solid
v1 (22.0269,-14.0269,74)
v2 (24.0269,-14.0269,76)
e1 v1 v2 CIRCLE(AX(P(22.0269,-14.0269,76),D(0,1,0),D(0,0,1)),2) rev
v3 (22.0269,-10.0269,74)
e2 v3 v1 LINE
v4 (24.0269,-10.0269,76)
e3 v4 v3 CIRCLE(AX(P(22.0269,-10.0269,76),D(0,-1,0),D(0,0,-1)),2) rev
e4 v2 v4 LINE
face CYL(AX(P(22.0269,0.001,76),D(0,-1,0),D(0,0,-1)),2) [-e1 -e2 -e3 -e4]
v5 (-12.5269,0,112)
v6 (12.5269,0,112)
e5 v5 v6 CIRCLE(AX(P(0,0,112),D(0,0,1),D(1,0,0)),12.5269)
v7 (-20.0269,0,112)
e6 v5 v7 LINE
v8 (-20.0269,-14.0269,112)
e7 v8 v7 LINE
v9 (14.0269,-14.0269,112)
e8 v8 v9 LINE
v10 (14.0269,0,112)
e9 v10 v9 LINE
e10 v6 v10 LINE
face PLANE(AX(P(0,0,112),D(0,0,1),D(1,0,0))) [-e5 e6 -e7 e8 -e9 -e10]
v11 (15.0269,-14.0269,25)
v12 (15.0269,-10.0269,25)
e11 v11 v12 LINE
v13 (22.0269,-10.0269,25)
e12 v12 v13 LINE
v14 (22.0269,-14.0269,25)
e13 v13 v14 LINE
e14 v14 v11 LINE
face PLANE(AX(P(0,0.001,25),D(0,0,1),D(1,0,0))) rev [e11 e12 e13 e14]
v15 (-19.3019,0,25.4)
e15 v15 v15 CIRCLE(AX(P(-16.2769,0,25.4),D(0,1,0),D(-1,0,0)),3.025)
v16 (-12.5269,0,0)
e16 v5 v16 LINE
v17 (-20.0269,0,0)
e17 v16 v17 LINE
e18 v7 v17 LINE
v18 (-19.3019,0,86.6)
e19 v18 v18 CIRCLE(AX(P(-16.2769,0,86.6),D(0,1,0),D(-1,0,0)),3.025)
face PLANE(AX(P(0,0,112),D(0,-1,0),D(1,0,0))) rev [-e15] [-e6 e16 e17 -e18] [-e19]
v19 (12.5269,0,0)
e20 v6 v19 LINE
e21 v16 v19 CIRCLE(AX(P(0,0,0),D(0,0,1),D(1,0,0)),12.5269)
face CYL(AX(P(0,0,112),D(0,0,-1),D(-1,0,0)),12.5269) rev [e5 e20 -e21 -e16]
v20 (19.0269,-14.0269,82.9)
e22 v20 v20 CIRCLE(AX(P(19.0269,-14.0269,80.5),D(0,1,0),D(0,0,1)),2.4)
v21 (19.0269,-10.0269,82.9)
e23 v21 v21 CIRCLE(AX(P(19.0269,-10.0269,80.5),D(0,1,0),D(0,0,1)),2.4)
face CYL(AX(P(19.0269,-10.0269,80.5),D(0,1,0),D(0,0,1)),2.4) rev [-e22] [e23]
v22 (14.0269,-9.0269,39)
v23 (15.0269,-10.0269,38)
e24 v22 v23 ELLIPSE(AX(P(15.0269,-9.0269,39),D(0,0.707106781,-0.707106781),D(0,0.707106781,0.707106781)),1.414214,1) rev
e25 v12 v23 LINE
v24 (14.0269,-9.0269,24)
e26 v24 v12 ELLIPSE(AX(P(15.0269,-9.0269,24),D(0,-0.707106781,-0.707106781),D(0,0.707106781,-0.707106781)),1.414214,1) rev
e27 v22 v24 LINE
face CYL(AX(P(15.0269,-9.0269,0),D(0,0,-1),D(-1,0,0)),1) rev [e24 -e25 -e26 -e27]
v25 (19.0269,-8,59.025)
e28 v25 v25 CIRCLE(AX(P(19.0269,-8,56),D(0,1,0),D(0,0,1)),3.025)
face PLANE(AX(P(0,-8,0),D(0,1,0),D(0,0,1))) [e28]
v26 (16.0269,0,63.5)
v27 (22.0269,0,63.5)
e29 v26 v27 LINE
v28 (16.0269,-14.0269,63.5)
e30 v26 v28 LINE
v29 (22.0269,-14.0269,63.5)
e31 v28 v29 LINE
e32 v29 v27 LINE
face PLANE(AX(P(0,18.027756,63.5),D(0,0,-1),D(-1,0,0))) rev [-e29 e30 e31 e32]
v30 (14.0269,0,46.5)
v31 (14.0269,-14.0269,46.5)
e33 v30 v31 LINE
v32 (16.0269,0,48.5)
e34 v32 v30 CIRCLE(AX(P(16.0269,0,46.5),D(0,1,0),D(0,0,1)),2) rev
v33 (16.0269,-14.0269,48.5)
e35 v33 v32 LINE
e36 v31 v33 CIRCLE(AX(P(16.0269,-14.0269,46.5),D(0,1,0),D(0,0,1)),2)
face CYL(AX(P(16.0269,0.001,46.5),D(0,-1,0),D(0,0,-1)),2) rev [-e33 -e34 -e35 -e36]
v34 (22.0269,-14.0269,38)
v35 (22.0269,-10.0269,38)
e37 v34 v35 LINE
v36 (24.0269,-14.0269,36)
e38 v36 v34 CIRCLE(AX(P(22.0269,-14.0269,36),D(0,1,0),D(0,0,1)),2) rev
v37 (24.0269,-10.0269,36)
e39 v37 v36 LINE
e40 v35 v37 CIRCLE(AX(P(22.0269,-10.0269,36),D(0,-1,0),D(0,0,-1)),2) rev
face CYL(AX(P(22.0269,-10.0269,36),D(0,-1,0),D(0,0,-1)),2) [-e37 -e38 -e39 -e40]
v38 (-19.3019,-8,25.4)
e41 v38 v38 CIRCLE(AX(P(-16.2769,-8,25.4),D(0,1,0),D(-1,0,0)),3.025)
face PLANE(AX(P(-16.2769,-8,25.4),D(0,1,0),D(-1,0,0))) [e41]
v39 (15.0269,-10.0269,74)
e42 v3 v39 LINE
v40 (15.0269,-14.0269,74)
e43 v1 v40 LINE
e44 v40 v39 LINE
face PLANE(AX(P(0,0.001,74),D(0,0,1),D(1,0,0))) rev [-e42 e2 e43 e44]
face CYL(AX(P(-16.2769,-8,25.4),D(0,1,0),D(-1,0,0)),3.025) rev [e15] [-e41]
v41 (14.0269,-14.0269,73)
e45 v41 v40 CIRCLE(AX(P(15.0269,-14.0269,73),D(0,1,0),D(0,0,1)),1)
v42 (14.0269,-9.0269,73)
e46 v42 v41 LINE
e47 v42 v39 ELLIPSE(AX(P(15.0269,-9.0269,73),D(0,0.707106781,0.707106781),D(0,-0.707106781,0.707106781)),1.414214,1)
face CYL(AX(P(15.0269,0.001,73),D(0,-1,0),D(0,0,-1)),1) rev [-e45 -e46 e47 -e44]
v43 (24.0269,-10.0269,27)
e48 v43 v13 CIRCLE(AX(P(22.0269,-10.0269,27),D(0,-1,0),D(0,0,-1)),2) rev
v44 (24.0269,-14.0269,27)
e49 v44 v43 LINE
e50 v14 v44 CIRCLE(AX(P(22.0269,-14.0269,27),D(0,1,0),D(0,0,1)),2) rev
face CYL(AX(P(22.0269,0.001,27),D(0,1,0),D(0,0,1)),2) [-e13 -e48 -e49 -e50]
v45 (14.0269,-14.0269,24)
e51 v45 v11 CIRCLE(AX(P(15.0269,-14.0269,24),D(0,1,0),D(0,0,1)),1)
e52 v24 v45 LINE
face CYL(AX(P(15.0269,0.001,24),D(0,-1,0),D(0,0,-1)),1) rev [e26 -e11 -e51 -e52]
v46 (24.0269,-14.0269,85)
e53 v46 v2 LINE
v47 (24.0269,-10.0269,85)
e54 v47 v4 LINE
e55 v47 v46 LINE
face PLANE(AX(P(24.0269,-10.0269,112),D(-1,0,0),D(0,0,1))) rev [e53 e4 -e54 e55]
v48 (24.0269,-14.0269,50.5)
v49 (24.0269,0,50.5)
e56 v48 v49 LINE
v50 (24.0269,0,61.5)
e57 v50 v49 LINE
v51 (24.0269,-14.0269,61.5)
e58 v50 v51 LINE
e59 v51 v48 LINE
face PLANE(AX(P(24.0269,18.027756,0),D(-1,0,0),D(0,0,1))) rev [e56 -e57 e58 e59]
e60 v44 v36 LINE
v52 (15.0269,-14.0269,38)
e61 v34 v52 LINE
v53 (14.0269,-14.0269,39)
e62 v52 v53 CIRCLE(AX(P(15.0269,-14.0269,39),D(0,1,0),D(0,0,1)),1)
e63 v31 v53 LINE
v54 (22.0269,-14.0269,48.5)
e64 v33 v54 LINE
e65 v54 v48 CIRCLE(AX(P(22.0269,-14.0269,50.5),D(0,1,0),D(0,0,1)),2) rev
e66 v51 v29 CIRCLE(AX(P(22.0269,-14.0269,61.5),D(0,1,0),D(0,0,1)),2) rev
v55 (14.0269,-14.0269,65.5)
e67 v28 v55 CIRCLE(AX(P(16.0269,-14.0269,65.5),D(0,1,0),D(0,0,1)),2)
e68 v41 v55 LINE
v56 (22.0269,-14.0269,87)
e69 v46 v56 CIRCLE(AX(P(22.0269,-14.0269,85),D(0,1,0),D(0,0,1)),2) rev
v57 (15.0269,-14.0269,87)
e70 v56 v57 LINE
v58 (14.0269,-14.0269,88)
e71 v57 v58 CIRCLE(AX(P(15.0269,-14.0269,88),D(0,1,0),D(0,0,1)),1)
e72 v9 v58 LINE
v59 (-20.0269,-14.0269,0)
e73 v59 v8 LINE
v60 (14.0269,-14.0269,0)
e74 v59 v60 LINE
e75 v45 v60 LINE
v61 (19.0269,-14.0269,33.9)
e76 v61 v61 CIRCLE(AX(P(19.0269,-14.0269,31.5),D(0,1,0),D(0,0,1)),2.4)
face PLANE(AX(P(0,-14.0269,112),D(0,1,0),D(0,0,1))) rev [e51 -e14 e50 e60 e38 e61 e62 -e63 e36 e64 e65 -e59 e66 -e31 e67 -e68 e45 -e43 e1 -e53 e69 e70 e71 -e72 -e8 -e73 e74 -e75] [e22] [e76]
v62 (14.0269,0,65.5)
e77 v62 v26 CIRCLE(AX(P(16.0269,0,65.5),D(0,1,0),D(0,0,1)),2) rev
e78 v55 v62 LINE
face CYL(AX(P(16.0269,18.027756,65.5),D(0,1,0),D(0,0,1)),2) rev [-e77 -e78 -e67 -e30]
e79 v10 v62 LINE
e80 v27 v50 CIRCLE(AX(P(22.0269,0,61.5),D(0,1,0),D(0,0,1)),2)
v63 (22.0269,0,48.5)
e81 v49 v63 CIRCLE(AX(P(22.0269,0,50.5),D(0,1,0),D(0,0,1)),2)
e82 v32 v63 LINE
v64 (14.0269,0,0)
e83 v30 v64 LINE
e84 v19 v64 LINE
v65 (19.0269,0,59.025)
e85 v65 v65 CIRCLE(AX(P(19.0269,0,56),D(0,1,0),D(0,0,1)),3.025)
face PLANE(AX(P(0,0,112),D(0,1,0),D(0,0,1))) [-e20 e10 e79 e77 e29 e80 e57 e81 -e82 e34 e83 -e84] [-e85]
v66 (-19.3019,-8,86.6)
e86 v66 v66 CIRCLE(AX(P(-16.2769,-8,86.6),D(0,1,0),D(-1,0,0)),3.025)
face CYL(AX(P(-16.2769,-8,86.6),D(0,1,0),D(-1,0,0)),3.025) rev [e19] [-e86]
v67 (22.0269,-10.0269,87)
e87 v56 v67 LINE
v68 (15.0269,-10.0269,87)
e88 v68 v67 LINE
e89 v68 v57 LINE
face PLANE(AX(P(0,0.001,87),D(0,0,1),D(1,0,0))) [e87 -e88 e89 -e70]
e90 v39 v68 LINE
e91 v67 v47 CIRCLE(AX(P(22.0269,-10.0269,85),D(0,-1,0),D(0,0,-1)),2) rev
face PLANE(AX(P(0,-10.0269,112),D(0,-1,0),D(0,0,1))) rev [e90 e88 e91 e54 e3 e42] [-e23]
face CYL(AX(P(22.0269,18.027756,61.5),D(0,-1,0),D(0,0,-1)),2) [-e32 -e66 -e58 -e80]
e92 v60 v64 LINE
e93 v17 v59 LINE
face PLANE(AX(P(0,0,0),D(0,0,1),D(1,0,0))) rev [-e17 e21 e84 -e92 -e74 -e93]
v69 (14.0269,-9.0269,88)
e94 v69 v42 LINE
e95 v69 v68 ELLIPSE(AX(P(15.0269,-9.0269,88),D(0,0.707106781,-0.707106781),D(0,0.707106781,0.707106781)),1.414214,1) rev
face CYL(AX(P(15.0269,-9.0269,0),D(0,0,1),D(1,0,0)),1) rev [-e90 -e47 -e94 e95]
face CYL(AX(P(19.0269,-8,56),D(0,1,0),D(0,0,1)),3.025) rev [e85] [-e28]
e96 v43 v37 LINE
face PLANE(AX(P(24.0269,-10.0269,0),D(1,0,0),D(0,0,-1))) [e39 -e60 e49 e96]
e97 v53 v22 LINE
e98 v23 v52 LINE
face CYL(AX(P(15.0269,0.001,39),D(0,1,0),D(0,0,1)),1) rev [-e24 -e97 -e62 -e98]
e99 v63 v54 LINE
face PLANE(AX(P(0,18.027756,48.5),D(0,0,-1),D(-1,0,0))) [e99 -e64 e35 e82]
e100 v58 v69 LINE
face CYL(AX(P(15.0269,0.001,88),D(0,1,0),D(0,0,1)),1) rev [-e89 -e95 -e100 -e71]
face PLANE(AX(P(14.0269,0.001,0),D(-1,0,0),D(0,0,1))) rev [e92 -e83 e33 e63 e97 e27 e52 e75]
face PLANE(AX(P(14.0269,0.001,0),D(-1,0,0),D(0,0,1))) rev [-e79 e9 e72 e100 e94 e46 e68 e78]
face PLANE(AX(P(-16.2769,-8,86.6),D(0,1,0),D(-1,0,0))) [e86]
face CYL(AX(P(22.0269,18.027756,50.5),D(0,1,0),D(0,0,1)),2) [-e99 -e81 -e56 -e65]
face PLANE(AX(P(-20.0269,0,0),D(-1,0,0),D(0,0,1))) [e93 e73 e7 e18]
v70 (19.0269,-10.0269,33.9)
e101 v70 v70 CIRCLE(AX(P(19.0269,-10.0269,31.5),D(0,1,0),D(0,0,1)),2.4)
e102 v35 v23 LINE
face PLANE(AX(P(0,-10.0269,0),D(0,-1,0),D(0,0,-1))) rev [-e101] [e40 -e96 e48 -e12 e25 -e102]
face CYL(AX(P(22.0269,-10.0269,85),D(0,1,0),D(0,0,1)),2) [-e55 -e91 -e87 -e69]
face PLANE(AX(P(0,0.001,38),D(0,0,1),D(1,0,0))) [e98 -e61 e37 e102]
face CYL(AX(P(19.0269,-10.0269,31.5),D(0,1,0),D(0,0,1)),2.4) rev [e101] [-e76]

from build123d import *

# Parameters (mm, degrees)
BOSS_EXTRUDE1_DEPTH  = 112
SKETCH3_W            = 11
SKETCH3_H            = 11
BOSS_EXTRUDE2_DEPTH  = 4
BOSS_EXTRUDE3_REACH  = 127.251
SKETCH8_W            = 10
SKETCH8_H            = 13
BOSS_EXTRUDE4_DEPTH  = 4
FILLET1_R            = 2
M4_CLEARANCE_HOLE1_D = 4.8
MIRROR1_START        = 13.844633107
MIRROR1_OUTLINE_W    = 4
MIRROR1_OUTLINE_H    = 13
MIRROR1_DEPTH        = 2.782266793
MIRROR1_START_2      = 21.4269001
MIRROR1_2_OUTLINE_W  = 4
MIRROR1_2_OUTLINE_H  = 13
MIRROR1_2_DEPTH      = 0.5999999
MIRROR1_START_3      = 74
MIRROR1_3_DEPTH      = 13
MIRROR1_4_OUTLINE_W  = 4.8000002
MIRROR1_4_OUTLINE_H  = 4
MIRROR1_4_DEPTH      = 4.0999999
MIRROR1_START_4      = 82.9000001
MIRROR1_5_OUTLINE_W  = 4.8000002
MIRROR1_5_OUTLINE_H  = 4
MIRROR1_5_DEPTH      = 4.0999999
MIRROR1_START_5      = 76
MIRROR1_6_OUTLINE_W  = 2
MIRROR1_6_OUTLINE_H  = 4
MIRROR1_6_DEPTH      = 9
MIRROR1_START_6      = -14.0269
MIRROR1_7_DEPTH      = 4
CUT_EXTRUDE2_DEPTH   = 126.72521882
BOSS_EXTRUDE5_START  = -87
BOSS_EXTRUDE5_DEPTH  = 112
SKETCH14_W           = 112
SKETCH14_H           = 14.0269
BOSS_EXTRUDE6_DEPTH  = 1
SKETCH2_R            = 3.025
CUT_EXTRUDE1_DEPTH   = 8
SKETCH15_W           = 10
SKETCH15_H           = 15
SKETCH15_R           = 3.025
BOSS_EXTRUDE7_DEPTH  = 14.0269
SKETCH16_R           = 3.025
CUT_EXTRUDE3_DEPTH   = 8
FILLET2_R            = 2
FILLET3_R            = 1


with BuildPart() as part:
    # Sketch1 → Boss-Extrude1 (new body)
    with BuildSketch(Plane.XY):
        with BuildLine():
            ThreePointArc((0, -14.0269), (-9.918516109, -9.918516109), (-14.0269, 0))
            Line((-14.0269, 0), (-19.0269, 0))
            Line((-19.0269, 0), (-19.0269, -14.0269))
            Line((-19.0269, -14.0269), (0, -14.0269))
        make_face()
        with BuildLine():
            Line((-12.5269, 0), (-14.0269, 0))
            ThreePointArc((-14.0269, 0), (-9.918516109, -9.918516109), (0, -14.0269))
            ThreePointArc((0, -14.0269), (9.918516109, -9.918516109), (14.0269, 0))
            Line((14.0269, 0), (12.5269, 0))
            ThreePointArc((12.5269, 0), (0, -12.5269), (-12.5269, 0))
        make_face()
    extrude(amount=BOSS_EXTRUDE1_DEPTH)

    # Sketch3 → Boss-Extrude2 (add)
    with BuildSketch(Plane.XZ.offset(14.0269)):
        with Locations((-13.5269, 117.5)):
            Rectangle(SKETCH3_W, SKETCH3_H)
    extrude(amount=-BOSS_EXTRUDE2_DEPTH)

    # Sketch7 → Boss-Extrude3 (add, up to next)
    with BuildSketch(Plane.XZ.offset(14.0269), mode=Mode.PRIVATE) as boss_extrude3_sk1:
        Polygon((0, 25), (14.0269, 25), (14.0269, 31.5), (14.0269, 38), (0, 38), align=None)
    boss_extrude3_tool1 = extrude(boss_extrude3_sk1.sketch, amount=-BOSS_EXTRUDE3_REACH, mode=Mode.PRIVATE) - part.part
    add(boss_extrude3_tool1.solids().sort_by_distance((7.01345, -14.0269, 31.5))[0])

    # Sketch8 → Boss-Extrude4 (add)
    with BuildSketch(Plane.XZ.offset(14.0269)):
        with Locations((19.0269, 31.5)):
            Rectangle(SKETCH8_W, SKETCH8_H)
    extrude(amount=-BOSS_EXTRUDE4_DEPTH)

    # Fillet1
    fillet1_edges = [part.edges().sort_by_distance(p)[0] for p in [
        (-19.0269, -12.0269, 123),
        (-8.0269, -12.0269, 123),
        (24.0269, -12.0269, 38),
        (24.0269, -12.0269, 25),
    ]]
    fillet(fillet1_edges, radius=FILLET1_R)

    # M4 Clearance Hole1 (through all)
    with Locations(Plane(origin=(0, -10.0269, 0), x_dir=(1, 0, 0), z_dir=(0, 1, 0))):
        with Locations((-13.5269, -117.5), (19.0269, -31.5)):
            Hole(M4_CLEARANCE_HOLE1_D / 2)



with BuildPart() as body_2:
    # Mirror1: read off the stored shape, not the designer's step
    # Mirror1 outline → Mirror1 (new body)
    with BuildSketch(Plane.YZ.offset(MIRROR1_START)):
        with Locations((-12.0269, 80.5)):
            Rectangle(MIRROR1_OUTLINE_W, MIRROR1_OUTLINE_H)
    extrude(amount=MIRROR1_DEPTH)


with BuildPart() as body_3:
    # Mirror1 2 outline → Mirror1 2 (new body)
    with BuildSketch(Plane.YZ.offset(MIRROR1_START_2)):
        with Locations((-12.0269, 80.5)):
            Rectangle(MIRROR1_2_OUTLINE_W, MIRROR1_2_OUTLINE_H)
    extrude(amount=MIRROR1_2_DEPTH)


with BuildPart() as part_1:
    add(part.part)

    add(body_2.part)  # Mirror1 3 merges body 2
    # Mirror1 3 outline → Mirror1 3 (add)
    with BuildSketch(Plane.XY.offset(MIRROR1_START_3)):
        with BuildLine():
            Line((16.6268999, -10.0269), (14.0269, -10.0269))
            Line((14.0269, -10.0269), (14.0269, 0))
            ThreePointArc((14.0269, 0), (9.918516109, -9.918516109), (0, -14.0269))
            Line((0, -14.0269), (13.844633107, -14.0269))
            Line((13.844633107, -14.0269), (16.6268999, -14.0269))
            Line((16.6268999, -14.0269), (16.6268999, -10.0269))
        make_face()
    extrude(amount=MIRROR1_3_DEPTH)


    add(body_3.part)  # Mirror1 4 merges body 3
    # Mirror1 4 outline → Mirror1 4 (add)
    with BuildSketch(Plane.XY.offset(MIRROR1_START_3)):
        with Locations((19.0269, -12.0269)):
            Rectangle(MIRROR1_4_OUTLINE_W, MIRROR1_4_OUTLINE_H)
    extrude(amount=MIRROR1_4_DEPTH)

    # Mirror1 5 outline → Mirror1 5 (add)
    with BuildSketch(Plane.XY.offset(MIRROR1_START_4)):
        with Locations((19.0269, -12.0269)):
            Rectangle(MIRROR1_5_OUTLINE_W, MIRROR1_5_OUTLINE_H)
    extrude(amount=MIRROR1_5_DEPTH)

    # Mirror1 6 outline → Mirror1 6 (add)
    with BuildSketch(Plane.XY.offset(MIRROR1_START_5)):
        with Locations((23.0269, -12.0269)):
            Rectangle(MIRROR1_6_OUTLINE_W, MIRROR1_6_OUTLINE_H)
    extrude(amount=MIRROR1_6_DEPTH)

    # Mirror1 7 outline → Mirror1 7 (add)
    with BuildSketch(Plane(origin=(0, 0, 0), x_dir=(1, 0, 0), z_dir=(0, 1, 0)).offset(MIRROR1_START_6)):
        with BuildLine():
            ThreePointArc((24.0269, -76), (23.441113562, -74.585786438), (22.0269, -74))
            Line((22.0269, -74), (22.0269, -76))
            Line((22.0269, -76), (24.0269, -76))
        make_face()
        with BuildLine():
            Line((22.0269, -85), (22.0269, -87))
            ThreePointArc((22.0269, -87), (23.441113562, -86.414213562), (24.0269, -85))
            Line((24.0269, -85), (22.0269, -85))
        make_face()
        with BuildLine():
            Line((21.4269001, -82.9000001), (21.4269, -80.5))
            ThreePointArc((21.4269, -80.5), (20.723956275, -82.197056275), (19.0269, -82.9))
            Line((19.0269, -82.9), (21.4269001, -82.9000001))
        make_face()
        with BuildLine():
            ThreePointArc((19.0269, -78.1), (20.723956275, -78.802943725), (21.4269, -80.5))
            Line((21.4269, -80.5), (21.4269001, -78.0999999))
            Line((21.4269001, -78.0999999), (19.0269, -78.1))
        make_face()
        with BuildLine():
            ThreePointArc((16.6269, -80.5), (17.329843725, -78.802943725), (19.0269, -78.1))
            Line((19.0269, -78.1), (16.6268999, -78.0999999))
            Line((16.6268999, -78.0999999), (16.6269, -80.5))
        make_face()
        with BuildLine():
            Line((16.6268999, -82.9000001), (19.0269, -82.9))
            ThreePointArc((19.0269, -82.9), (17.329843725, -82.197056275), (16.6269, -80.5))
            Line((16.6269, -80.5), (16.6268999, -82.9000001))
        make_face()
    extrude(amount=MIRROR1_7_DEPTH)

    # Sketch12 → Cut-Extrude2 (cut, through all)
    with BuildSketch(Plane(origin=(0, -10.0269, 0), x_dir=(1, 0, 0), z_dir=(0, 1, 0))):
        with BuildLine():
            Line((-19.0269, -112), (-19.0269, -121))
            ThreePointArc((-19.0269, -121), (-18.441113562, -122.414213562), (-17.0269, -123))
            Line((-17.0269, -123), (-10.0269, -123))
            ThreePointArc((-10.0269, -123), (-8.612686438, -122.414213562), (-8.0269, -121))
            Line((-8.0269, -121), (-8.0269, -112))
            Line((-8.0269, -112), (-19.0269, -112))
        make_face()
    extrude(amount=-CUT_EXTRUDE2_DEPTH, mode=Mode.SUBTRACT)

    # Sketch13 → Boss-Extrude5 (add)
    with BuildSketch(Plane.XY.offset(87).offset(BOSS_EXTRUDE5_START)):
        with BuildLine():
            Line((14.0269, -14.0269), (14.0269, -10.0269))
            Line((14.0269, -10.0269), (14.0269, 0))
            ThreePointArc((14.0269, 0), (9.918516109, -9.918516109), (0, -14.0269))
            Line((0, -14.0269), (14.0269, -14.0269))
        make_face()
    extrude(amount=BOSS_EXTRUDE5_DEPTH)

    # Sketch14 → Boss-Extrude6 (add)
    with BuildSketch(Plane.ZY.offset(19.0269)):
        with Locations((56, -7.01345)):
            Rectangle(SKETCH14_W, SKETCH14_H)
    extrude(amount=BOSS_EXTRUDE6_DEPTH)

    # Sketch2 → Cut-Extrude1 (cut)
    with BuildSketch(Plane(origin=(0, 0, 0), x_dir=(1, 0, 0), z_dir=(0, 1, 0))):
        with Locations(Location((-16.2769, -25.4, 0), (0, 0, 180))):
            Circle(SKETCH2_R)
        with Locations(Location((-16.2769, -86.6, 0), (0, 0, 180))):
            Circle(SKETCH2_R)
    extrude(amount=-CUT_EXTRUDE1_DEPTH, mode=Mode.SUBTRACT)

    # Sketch15 → Boss-Extrude7 (add)
    # profile 1 of 2: a face of its own
    with BuildSketch(Plane.XZ.offset(14.0269)):
        with Locations((19.0269, 56)):
            Rectangle(SKETCH15_W, SKETCH15_H)
        with Locations((19.0269, 56)):
            Circle(SKETCH15_R, mode=Mode.SUBTRACT)
    # profile 2 of 2: a face of its own
    with BuildSketch(Plane.XZ.offset(14.0269)):
        with Locations((19.0269, 56)):
            Circle(SKETCH15_R)
    extrude(amount=-BOSS_EXTRUDE7_DEPTH)

    # Sketch16 → Cut-Extrude3 (cut)
    with BuildSketch(Plane(origin=(0, 0, 0), x_dir=(1, 0, 0), z_dir=(0, 1, 0))):
        with Locations(Location((19.0269, -56, 0), (0, 0, 270))):
            Circle(SKETCH16_R)
    extrude(amount=-CUT_EXTRUDE3_DEPTH, mode=Mode.SUBTRACT)

    # Fillet2
    fillet2_edges = [part_1.edges().sort_by_distance(p)[0] for p in [
        (24.0269, -7.01345, 63.5),
        (24.0269, -7.01345, 48.5),
        (14.0269, -7.01345, 48.5),
        (14.0269, -7.01345, 63.5),
    ]]
    fillet(fillet2_edges, radius=FILLET2_R)

    # Fillet3
    fillet3_edges = [part_1.edges().sort_by_distance(p)[0] for p in [
        (14.0269, -10.0269, 80.5),
        (14.0269, -12.0269, 25),
        (14.0269, -12.0269, 38),
        (14.0269, -12.0269, 74),
        (14.0269, -12.0269, 87),
        (14.0269, -10.0269, 31.5),
    ]]
    fillet(fillet3_edges, radius=FILLET3_R)


solid = part_1.part
